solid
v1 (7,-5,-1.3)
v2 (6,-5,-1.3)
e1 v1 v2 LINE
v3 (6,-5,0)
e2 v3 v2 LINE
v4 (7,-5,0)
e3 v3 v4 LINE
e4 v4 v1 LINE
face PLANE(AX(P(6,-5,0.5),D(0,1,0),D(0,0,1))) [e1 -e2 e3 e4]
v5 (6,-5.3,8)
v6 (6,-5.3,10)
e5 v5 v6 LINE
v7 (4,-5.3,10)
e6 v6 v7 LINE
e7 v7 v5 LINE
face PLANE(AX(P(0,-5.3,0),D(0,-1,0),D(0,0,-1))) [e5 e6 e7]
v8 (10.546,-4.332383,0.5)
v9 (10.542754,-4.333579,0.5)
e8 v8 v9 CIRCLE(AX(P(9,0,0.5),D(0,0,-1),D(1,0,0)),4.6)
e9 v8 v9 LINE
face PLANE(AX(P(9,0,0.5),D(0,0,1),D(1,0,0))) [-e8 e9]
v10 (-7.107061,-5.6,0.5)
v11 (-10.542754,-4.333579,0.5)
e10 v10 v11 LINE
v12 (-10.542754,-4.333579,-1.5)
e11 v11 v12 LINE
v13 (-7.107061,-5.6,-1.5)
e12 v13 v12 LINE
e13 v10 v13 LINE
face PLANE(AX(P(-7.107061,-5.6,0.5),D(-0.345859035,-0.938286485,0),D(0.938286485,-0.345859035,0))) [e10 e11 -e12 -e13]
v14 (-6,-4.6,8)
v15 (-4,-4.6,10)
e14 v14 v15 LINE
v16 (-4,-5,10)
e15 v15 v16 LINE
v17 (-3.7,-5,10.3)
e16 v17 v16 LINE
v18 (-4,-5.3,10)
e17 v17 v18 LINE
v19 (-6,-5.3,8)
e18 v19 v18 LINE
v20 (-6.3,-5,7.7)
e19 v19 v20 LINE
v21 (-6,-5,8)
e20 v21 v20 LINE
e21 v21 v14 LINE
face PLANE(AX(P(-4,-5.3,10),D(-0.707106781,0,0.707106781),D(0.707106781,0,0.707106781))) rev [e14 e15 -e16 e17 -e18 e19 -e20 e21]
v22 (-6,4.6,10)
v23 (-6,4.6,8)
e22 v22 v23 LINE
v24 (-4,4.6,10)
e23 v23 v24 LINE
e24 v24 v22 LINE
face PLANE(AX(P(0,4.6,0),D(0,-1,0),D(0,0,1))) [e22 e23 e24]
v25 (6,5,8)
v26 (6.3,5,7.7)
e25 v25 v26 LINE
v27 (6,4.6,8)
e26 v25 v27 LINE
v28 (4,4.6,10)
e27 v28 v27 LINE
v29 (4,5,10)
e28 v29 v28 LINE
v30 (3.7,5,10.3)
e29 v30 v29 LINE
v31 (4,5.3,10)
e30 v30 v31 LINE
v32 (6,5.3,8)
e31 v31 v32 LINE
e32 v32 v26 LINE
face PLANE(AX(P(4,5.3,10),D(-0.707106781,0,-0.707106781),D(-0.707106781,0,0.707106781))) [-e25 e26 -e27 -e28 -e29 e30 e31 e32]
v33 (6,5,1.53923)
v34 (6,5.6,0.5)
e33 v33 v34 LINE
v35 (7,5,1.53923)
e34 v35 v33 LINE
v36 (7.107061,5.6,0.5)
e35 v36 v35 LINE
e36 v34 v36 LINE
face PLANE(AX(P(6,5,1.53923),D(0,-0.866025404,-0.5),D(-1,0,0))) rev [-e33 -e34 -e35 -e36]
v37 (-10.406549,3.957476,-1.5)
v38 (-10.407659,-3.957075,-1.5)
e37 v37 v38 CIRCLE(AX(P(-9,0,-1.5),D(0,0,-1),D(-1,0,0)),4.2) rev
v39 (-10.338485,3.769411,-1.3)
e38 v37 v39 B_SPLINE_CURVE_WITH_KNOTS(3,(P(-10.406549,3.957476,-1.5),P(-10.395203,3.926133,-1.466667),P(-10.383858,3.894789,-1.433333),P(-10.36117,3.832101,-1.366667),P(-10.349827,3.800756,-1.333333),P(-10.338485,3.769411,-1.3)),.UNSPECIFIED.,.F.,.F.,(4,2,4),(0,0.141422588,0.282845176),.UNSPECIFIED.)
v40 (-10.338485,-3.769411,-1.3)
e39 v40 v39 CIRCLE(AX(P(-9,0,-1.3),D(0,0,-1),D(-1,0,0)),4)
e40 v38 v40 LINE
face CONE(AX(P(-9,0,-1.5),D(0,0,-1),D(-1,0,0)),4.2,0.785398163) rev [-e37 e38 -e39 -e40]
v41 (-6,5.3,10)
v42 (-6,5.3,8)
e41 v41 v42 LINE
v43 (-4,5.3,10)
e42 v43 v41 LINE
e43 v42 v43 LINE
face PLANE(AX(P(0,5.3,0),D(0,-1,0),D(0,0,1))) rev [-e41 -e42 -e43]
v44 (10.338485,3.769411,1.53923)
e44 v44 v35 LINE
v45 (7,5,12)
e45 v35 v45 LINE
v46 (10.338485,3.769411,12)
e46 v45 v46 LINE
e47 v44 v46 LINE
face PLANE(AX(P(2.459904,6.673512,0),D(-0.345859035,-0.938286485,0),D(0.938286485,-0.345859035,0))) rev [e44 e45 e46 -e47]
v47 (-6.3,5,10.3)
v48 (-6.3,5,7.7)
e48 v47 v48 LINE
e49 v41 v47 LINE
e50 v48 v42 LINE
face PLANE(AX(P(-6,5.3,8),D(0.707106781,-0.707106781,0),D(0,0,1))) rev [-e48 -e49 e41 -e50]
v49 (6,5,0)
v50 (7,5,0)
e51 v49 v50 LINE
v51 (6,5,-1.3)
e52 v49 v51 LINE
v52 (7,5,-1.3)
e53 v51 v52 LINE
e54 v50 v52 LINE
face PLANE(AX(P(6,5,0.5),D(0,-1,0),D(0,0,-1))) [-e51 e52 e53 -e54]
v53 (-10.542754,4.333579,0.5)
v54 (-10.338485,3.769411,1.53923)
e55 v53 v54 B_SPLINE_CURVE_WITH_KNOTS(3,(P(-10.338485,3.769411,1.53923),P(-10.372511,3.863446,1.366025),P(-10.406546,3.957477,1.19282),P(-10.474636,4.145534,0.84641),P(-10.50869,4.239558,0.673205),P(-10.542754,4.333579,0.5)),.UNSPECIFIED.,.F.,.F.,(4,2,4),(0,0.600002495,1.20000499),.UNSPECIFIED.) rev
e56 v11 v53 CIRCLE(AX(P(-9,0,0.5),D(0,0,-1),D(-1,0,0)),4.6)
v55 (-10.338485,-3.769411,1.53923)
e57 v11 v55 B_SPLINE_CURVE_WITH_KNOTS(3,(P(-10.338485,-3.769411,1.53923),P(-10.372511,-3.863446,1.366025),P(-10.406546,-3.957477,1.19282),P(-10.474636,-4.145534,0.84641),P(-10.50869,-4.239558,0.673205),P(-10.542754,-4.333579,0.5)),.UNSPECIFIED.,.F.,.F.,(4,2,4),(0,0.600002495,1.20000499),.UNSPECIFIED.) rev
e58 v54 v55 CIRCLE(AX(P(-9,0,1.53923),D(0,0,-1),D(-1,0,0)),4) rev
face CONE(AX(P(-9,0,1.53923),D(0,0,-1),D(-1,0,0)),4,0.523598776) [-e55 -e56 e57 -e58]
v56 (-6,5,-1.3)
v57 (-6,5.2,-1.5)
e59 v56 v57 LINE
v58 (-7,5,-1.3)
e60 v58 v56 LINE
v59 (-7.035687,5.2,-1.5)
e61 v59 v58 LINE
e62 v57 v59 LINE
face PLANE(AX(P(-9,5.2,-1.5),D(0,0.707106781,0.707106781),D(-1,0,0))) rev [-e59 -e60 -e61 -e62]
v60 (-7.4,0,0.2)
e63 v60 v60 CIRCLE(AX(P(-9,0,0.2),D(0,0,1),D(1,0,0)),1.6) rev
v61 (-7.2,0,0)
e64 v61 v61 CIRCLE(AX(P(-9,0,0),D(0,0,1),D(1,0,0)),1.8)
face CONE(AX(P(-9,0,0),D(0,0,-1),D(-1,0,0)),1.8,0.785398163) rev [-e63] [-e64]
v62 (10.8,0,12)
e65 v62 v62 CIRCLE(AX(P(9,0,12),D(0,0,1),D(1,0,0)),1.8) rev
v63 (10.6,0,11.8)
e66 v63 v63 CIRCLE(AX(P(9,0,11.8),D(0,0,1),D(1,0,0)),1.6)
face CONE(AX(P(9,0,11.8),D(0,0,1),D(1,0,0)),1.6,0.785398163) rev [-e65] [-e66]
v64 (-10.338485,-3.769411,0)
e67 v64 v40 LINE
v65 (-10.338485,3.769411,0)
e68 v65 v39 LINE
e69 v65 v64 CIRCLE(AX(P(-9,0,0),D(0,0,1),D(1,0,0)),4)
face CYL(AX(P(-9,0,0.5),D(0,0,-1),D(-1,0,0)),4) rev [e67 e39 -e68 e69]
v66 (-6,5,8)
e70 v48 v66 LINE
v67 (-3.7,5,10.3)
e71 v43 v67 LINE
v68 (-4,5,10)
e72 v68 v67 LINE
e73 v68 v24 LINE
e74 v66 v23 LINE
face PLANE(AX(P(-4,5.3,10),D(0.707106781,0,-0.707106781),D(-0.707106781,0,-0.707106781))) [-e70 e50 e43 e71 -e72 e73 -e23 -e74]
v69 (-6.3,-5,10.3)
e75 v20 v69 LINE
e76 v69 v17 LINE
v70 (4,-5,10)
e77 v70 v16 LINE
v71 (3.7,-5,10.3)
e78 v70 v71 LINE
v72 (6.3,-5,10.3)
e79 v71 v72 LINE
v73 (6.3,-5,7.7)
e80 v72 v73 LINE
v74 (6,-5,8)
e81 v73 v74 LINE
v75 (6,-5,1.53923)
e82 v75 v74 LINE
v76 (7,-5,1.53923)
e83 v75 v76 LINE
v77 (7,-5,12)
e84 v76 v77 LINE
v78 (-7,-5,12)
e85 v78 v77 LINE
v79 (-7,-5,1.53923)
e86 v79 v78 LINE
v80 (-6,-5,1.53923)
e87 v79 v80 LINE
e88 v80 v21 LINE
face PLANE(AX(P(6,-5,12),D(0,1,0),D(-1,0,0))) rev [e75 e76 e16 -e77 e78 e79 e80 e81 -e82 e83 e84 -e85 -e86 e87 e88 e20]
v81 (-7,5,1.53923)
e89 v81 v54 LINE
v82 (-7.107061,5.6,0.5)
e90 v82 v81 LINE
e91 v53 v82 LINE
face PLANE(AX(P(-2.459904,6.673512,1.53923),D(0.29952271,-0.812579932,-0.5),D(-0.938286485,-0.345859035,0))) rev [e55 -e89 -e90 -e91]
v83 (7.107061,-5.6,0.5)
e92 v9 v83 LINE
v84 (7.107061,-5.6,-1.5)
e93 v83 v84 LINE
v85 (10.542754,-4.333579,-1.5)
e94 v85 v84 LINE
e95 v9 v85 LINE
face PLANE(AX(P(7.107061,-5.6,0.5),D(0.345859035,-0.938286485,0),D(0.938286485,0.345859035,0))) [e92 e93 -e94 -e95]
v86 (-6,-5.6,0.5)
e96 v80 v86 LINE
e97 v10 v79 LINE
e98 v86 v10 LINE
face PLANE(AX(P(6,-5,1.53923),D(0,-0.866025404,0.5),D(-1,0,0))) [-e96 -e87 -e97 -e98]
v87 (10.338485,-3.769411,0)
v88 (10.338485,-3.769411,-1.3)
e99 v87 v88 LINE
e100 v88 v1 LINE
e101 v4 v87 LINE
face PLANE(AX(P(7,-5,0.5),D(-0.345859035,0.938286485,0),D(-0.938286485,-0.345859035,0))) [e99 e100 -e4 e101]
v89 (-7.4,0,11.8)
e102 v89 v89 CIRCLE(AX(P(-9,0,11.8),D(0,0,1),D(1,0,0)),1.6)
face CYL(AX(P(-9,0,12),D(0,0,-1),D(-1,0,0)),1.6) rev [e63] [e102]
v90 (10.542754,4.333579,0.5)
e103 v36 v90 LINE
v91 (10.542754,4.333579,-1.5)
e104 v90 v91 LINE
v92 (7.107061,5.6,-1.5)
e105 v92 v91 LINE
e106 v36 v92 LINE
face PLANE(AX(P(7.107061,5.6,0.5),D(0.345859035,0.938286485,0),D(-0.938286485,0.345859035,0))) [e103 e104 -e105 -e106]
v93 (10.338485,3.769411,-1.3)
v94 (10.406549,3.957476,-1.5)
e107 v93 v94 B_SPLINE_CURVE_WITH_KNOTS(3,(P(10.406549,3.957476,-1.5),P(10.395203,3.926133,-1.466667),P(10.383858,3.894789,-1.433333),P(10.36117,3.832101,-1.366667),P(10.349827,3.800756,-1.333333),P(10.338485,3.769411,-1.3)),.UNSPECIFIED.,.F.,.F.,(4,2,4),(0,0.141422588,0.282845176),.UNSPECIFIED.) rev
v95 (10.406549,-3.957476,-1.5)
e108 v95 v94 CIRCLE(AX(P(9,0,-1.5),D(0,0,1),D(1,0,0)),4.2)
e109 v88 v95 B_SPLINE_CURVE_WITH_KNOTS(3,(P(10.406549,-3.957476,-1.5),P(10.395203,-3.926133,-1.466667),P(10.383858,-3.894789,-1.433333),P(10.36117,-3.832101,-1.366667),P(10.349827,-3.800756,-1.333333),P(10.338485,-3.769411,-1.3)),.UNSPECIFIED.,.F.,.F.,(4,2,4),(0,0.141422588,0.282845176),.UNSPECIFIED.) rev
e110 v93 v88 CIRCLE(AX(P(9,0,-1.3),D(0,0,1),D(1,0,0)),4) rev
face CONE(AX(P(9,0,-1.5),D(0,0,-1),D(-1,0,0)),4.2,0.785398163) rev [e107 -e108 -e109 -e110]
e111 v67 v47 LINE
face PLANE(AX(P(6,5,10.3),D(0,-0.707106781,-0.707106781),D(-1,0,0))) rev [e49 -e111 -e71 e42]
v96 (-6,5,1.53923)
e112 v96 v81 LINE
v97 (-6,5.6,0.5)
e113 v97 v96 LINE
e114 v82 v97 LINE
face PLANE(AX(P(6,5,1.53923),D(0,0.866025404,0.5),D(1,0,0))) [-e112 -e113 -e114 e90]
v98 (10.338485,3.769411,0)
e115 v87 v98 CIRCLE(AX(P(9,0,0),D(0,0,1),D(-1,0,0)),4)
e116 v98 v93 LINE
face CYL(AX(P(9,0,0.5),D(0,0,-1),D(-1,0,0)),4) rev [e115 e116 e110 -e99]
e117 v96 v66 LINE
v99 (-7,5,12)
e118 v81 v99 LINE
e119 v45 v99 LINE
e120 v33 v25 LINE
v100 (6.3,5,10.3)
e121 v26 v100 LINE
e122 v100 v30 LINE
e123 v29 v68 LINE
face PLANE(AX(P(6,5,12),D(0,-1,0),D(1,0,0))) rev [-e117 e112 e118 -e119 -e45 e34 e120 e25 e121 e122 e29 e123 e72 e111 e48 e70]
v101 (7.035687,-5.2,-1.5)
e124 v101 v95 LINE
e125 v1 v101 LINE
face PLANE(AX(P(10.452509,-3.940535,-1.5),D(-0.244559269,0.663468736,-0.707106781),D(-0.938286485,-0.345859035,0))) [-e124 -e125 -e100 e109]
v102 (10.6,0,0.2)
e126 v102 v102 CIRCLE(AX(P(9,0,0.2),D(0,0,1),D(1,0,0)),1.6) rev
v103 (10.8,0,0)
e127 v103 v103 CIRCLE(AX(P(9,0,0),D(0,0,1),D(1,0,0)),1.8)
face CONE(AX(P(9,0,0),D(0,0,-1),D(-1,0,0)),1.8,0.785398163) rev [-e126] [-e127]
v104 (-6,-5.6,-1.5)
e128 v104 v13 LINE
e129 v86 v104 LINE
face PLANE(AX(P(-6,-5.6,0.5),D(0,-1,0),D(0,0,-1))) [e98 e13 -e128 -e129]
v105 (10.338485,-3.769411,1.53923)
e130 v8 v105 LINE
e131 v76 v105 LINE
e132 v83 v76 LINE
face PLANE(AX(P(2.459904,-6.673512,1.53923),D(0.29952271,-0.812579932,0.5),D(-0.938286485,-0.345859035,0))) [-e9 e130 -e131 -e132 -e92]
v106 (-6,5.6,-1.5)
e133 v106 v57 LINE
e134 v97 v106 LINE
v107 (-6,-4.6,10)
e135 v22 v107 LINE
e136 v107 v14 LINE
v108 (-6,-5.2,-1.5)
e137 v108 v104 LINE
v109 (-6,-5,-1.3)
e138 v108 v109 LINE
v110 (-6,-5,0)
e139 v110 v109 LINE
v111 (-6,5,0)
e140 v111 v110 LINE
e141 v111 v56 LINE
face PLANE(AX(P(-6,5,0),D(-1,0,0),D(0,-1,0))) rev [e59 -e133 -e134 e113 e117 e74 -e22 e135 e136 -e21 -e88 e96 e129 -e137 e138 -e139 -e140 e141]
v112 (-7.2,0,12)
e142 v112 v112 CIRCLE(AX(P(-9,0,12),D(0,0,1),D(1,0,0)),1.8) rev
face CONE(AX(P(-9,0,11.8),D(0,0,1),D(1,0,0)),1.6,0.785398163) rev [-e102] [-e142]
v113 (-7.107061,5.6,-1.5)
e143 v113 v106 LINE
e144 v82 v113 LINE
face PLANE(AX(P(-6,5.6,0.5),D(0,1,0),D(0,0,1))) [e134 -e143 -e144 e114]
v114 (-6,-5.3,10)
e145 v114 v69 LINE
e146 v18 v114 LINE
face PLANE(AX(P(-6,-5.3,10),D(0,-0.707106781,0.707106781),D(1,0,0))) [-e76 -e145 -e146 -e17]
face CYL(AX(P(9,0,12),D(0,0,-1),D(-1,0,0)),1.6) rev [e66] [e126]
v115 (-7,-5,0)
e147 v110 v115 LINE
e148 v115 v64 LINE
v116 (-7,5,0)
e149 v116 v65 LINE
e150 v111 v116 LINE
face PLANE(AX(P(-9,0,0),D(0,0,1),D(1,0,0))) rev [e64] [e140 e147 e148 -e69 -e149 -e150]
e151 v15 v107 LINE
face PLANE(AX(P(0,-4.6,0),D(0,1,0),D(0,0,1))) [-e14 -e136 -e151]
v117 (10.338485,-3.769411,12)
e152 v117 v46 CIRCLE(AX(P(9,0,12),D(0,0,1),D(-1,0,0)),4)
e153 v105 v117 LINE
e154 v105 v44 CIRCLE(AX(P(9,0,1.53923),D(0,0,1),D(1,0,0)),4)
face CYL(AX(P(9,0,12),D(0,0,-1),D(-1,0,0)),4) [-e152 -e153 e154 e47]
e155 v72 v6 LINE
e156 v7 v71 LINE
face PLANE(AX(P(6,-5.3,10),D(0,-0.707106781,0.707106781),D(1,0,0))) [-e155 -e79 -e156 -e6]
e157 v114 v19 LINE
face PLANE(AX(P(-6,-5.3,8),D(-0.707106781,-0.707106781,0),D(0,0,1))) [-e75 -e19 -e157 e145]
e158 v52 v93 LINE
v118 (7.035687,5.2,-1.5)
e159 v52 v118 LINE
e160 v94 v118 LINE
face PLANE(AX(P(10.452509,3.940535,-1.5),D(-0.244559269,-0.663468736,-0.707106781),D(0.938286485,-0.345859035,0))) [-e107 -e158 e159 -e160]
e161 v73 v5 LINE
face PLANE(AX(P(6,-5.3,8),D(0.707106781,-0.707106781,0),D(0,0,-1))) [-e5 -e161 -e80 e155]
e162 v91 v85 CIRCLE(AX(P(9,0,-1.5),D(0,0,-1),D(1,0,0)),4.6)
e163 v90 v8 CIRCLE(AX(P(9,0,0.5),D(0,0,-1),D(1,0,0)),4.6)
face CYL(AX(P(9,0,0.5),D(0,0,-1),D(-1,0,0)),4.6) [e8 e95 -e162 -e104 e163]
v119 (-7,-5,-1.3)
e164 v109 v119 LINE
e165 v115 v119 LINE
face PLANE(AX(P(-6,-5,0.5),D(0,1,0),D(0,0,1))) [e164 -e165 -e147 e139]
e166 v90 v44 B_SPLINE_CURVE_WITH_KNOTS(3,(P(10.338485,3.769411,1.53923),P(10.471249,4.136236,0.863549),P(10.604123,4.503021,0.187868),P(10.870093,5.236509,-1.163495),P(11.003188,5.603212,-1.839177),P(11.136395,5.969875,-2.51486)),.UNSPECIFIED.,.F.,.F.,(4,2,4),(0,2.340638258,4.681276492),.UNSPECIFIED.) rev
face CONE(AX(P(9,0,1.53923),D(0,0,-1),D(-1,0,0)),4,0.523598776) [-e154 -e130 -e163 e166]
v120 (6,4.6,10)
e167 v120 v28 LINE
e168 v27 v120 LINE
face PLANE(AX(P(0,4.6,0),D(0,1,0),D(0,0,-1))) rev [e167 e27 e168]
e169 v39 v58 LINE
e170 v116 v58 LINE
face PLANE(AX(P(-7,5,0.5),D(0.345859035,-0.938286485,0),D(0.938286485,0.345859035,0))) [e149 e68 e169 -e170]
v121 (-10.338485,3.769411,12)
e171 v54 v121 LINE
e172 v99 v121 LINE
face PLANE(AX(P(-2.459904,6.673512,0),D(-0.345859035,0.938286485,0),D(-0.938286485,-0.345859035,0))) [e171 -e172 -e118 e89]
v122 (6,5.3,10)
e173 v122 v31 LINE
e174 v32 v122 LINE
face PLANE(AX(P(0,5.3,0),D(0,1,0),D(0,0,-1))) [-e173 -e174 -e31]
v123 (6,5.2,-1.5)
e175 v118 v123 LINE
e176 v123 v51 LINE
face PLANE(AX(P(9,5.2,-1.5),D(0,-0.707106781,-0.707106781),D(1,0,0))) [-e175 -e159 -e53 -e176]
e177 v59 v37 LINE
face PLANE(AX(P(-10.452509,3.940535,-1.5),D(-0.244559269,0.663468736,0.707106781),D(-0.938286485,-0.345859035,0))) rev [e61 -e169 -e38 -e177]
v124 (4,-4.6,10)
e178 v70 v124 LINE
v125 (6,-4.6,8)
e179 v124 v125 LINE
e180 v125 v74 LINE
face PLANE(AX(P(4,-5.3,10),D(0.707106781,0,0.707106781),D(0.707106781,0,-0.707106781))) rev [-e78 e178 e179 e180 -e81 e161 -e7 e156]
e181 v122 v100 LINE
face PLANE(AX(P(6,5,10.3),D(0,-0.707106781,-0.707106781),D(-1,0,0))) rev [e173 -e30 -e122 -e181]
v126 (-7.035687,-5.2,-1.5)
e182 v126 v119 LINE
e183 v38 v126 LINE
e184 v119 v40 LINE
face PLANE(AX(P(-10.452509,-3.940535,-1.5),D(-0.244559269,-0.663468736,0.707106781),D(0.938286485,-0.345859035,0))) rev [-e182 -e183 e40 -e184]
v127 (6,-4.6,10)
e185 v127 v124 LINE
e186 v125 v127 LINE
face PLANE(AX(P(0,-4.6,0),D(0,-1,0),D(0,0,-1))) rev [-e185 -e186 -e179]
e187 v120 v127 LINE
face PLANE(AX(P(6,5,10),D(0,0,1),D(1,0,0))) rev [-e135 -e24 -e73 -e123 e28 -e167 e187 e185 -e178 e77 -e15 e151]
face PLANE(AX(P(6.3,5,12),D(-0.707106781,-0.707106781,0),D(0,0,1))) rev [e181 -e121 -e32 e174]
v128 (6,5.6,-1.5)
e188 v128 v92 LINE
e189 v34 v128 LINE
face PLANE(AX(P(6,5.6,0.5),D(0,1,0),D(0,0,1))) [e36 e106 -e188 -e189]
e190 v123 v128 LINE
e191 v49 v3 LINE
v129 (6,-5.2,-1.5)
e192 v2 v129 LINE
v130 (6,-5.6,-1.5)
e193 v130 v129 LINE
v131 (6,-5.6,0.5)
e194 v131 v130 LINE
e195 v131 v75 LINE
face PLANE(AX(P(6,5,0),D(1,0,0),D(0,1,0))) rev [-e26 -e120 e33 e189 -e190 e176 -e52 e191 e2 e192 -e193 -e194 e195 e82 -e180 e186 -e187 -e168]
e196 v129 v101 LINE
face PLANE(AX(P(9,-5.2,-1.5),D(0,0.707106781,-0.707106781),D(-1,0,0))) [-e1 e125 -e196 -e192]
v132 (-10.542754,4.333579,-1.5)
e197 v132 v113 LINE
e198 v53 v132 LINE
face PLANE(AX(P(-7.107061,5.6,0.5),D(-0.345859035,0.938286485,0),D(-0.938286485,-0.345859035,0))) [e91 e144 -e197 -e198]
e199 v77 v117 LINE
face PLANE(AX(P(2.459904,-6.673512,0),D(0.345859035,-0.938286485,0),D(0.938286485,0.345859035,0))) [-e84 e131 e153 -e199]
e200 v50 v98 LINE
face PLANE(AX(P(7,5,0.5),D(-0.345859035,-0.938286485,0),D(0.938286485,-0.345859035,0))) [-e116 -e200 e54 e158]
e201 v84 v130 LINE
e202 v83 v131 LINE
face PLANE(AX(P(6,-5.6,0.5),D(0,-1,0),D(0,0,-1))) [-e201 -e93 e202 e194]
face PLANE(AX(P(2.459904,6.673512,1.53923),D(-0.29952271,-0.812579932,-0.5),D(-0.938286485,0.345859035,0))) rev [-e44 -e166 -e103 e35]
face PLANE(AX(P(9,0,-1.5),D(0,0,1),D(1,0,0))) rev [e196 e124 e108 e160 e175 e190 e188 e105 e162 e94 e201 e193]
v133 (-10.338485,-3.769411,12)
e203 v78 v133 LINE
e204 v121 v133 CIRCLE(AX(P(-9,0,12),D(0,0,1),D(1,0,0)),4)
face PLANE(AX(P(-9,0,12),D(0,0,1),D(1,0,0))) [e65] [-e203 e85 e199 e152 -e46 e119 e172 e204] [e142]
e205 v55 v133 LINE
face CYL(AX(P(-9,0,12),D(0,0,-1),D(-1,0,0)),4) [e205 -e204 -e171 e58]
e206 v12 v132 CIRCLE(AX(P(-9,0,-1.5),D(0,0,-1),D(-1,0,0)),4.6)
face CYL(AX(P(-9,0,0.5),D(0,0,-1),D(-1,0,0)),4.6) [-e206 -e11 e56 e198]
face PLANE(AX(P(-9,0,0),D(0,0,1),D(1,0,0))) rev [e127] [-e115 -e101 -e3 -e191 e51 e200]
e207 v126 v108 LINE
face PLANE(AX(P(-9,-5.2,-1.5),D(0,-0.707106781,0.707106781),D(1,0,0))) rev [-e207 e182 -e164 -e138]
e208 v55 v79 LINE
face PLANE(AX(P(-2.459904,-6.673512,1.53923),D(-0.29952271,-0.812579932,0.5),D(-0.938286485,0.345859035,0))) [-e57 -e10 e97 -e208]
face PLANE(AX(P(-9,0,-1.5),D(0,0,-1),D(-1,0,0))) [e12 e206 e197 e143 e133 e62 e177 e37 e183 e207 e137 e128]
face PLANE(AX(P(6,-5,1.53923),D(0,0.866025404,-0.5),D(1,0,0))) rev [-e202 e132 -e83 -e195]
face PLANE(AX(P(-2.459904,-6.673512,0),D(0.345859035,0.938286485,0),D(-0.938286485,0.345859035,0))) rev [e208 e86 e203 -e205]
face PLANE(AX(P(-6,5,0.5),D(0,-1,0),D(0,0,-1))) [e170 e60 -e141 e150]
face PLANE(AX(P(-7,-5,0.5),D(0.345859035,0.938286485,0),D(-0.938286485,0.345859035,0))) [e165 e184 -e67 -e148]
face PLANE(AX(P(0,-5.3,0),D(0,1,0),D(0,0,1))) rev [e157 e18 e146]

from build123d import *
from OCP.BRepFilletAPI import BRepFilletAPI_MakeChamfer

# Parameters (mm, degrees)
SKIZZE2_R                            = 1.6
AUFSATZ_LINEAR_AUSTRAGEN1_DEPTH      = 12
SCHNITT_LINEAR_AUSTRAGEN1_DEPTH      = 19.384776311
SCHNITT_LINEAR_AUSTRAGEN1_DEPTH_BACK = 19.384776311
SKIZZE3_W                            = 12
SKIZZE3_H                            = 10
AUFSATZ_LINEAR_AUSTRAGEN2_DEPTH      = 12
AUFSATZ_LINEAR_START                 = -0.4
AUFSATZ_LINEAR_AUSTRAGEN3_DEPTH      = 0.7
FASE3_SIZE                           = 0.3
AUFSATZ_LINEAR_AUSTRAGEN4_DEPTH      = 2
FASE1_SIZE                           = 0.6
FASE1_SIZE_2                         = 1.039230485
FASE2_SIZE                           = 0.2


with BuildPart() as part:
    # Skizze2 → Aufsatz-Linear austragen1 (new body)
    with BuildSketch(Plane.XY):
        with BuildLine():
            Line((-6, -2.645751311), (-6, -5))
            Line((-6, -5), (6, -5))
            Line((6, -5), (6, -2.645751311))
            ThreePointArc((6, -2.645751311), (13, 0), (6, 2.645751311))
            Line((6, 2.645751311), (6, 5))
            Line((6, 5), (-6, 5))
            Line((-6, 5), (-6, 2.645751311))
            ThreePointArc((-6, 2.645751311), (-13, 0), (-6, -2.645751311))
        make_face()
        with Locations((-9, 0)):
            Circle(SKIZZE2_R, mode=Mode.SUBTRACT)
        with Locations(Location((9, 0, 0), (0, 0, 180))):
            Circle(SKIZZE2_R, mode=Mode.SUBTRACT)
    extrude(amount=AUFSATZ_LINEAR_AUSTRAGEN1_DEPTH)

    # Skizze3 → Schnitt-Linear austragen1 (cut, two sides: drawn at the far end of the back side and taken through both)
    with BuildSketch(Plane(origin=(0, 0, 0), x_dir=(-1, 0, 0), z_dir=(0, -1, 0)).offset(-SCHNITT_LINEAR_AUSTRAGEN1_DEPTH_BACK)):
        with Locations((0, -5)):
            Rectangle(SKIZZE3_W, SKIZZE3_H)
    extrude(amount=SCHNITT_LINEAR_AUSTRAGEN1_DEPTH + SCHNITT_LINEAR_AUSTRAGEN1_DEPTH_BACK, mode=Mode.SUBTRACT)

    # Skizze4 → Aufsatz-Linear austragen2 (add, through all)
    with BuildSketch(Plane.XY.offset(12)):
        with BuildLine():
            Line((-6, 2.645751311), (-6, 5))
            Line((-6, 5), (-7, 5))
            Line((-7, 5), (-10.338485005, 3.769410815))
            ThreePointArc((-10.338485005, 3.769410815), (-7.997098863, 3.872233117), (-6, 2.645751311))
        make_face()
        with BuildLine():
            ThreePointArc((-6, -2.645751311), (-7.997098863, -3.872233117), (-10.338485005, -3.769410815))
            Line((-10.338485005, -3.769410815), (-7, -5))
            Line((-7, -5), (-6, -5))
            Line((-6, -5), (-6, -2.645751311))
        make_face()
        with BuildLine():
            ThreePointArc((6, 2.645751311), (7.997098863, 3.872233117), (10.338485005, 3.769410815))
            Line((10.338485005, 3.769410815), (7, 5))
            Line((7, 5), (6, 5))
            Line((6, 5), (6, 2.645751311))
        make_face()
        with BuildLine():
            Line((6, -2.645751311), (6, -5))
            Line((6, -5), (7, -5))
            Line((7, -5), (10.338485005, -3.769410815))
            ThreePointArc((10.338485005, -3.769410815), (7.997098863, -3.872233117), (6, -2.645751311))
        make_face()
    extrude(amount=-AUFSATZ_LINEAR_AUSTRAGEN2_DEPTH)

    # Skizze5 → Aufsatz-Linear austragen3 (add)
    with BuildSketch(Plane.XZ.offset(5).offset(AUFSATZ_LINEAR_START)):
        Polygon((-6, 10), (-4, 10), (-6, 8), align=None)
        Polygon((6, 8), (6, 10), (4, 10), align=None)
    aufsatz_linear_austragen3 = extrude(amount=AUFSATZ_LINEAR_AUSTRAGEN3_DEPTH)

    # Spiegeln1: Aufsatz-Linear austragen3 across plane
    add(aufsatz_linear_austragen3.mirror(Plane(origin=(0, 0, 0), x_dir=(0, 0, 1), z_dir=(0, -1, 0))))

    # Fase3
    fase3_edges = [part.edges().sort_by_distance(p)[0] for p in [
        (6, -5, 9),
        (5, -5, 10),
        (-6, -5, 9),
        (-5, -5, 10),
        (6, 5, 9),
        (5, 5, 10),
        (-5, 5, 10),
        (-6, 5, 9),
    ]]
    chamfer(fase3_edges, length=FASE3_SIZE - 0.0001)  # a hair under: the kernel refuses the full size

    # Skizze6 → Aufsatz-Linear austragen4 (add)
    with BuildSketch(Plane(origin=(0, 0, -1.5), x_dir=(-1, 0, 0), z_dir=(0, 0, -1))):
        with BuildLine():
            Line((6, -5), (7, -5))
            Line((7, -5), (10.338485005, -3.769410815))
            ThreePointArc((10.338485005, -3.769410815), (13, 0), (10.338485005, 3.769410815))
            Line((10.338485005, 3.769410815), (7, 5))
            Line((7, 5), (6, 5))
            Line((6, 5), (6, 5.6))
            Line((6, 5.6), (7.107061274, 5.6))
            Line((7.107061274, 5.6), (10.542753877, 4.333579407))
            ThreePointArc((10.542753877, 4.333579407), (13.6, 0), (10.542753877, -4.333579407))
            Line((10.542753877, -4.333579407), (7.107061274, -5.6))
            Line((7.107061274, -5.6), (6, -5.6))
            Line((6, -5.6), (6, -5))
        make_face()
        with BuildLine():
            Line((-6, -5), (-6, -5.6))
            Line((-6, -5.6), (-7.107061274, -5.6))
            Line((-7.107061274, -5.6), (-10.542753877, -4.333579407))
            ThreePointArc((-10.542753877, -4.333579407), (-13.6, 0), (-10.542753877, 4.333579407))
            Line((-10.542753877, 4.333579407), (-7.107061274, 5.6))
            Line((-7.107061274, 5.6), (-6, 5.6))
            Line((-6, 5.6), (-6, 5))
            Line((-6, 5), (-7, 5))
            Line((-7, 5), (-10.338485005, 3.769410815))
            ThreePointArc((-10.338485005, 3.769410815), (-13, 0), (-10.338485005, -3.769410815))
            Line((-10.338485005, -3.769410815), (-7, -5))
            Line((-7, -5), (-6, -5))
        make_face()
    extrude(amount=-AUFSATZ_LINEAR_AUSTRAGEN4_DEPTH)

    # Fase1
    fase1_edges_1 = [part.edges().sort_by_distance(p)[0] for p in [
        (-6.5, -5, 0.5),
    ]]
    fase1_side_1 = [part.faces().sort_by_distance(p)[0] for p in [
        (-6.5, -5.012, 0.5),
    ]]
    fase1_edges_2 = [part.edges().sort_by_distance(p)[0] for p in [
        (-8.669242502, -4.384705408, 0.5),
    ]]
    fase1_side_2 = [part.faces().sort_by_distance(p)[0] for p in [
        (-8.673392811, -4.395964845, 0.5),
    ]]
    fase1_edges_3 = [part.edges().sort_by_distance(p)[0] for p in [
        (-8.669242502, 4.384705408, 0.5),
    ]]
    fase1_side_3 = [part.faces().sort_by_distance(p)[0] for p in [
        (-8.673392811, 4.395964845, 0.5),
    ]]
    fase1_edges_4 = [part.edges().sort_by_distance(p)[0] for p in [
        (-6.5, 5, 0.5),
    ]]
    fase1_side_4 = [part.faces().sort_by_distance(p)[0] for p in [
        (-6.5, 5, 0.512),
    ]]
    fase1_edges_5 = [part.edges().sort_by_distance(p)[0] for p in [
        (6.5, 5, 0.5),
    ]]
    fase1_side_5 = [part.faces().sort_by_distance(p)[0] for p in [
        (6.5, 5, 0.512),
    ]]
    fase1_edges_6 = [part.edges().sort_by_distance(p)[0] for p in [
        (8.669242502, 4.384705408, 0.5),
    ]]
    fase1_side_6 = [part.faces().sort_by_distance(p)[0] for p in [
        (8.669242502, 4.384705408, 0.512),
    ]]
    fase1_edges_7 = [part.edges().sort_by_distance(p)[0] for p in [
        (8.669242502, -4.384705408, 0.5),
    ]]
    fase1_side_7 = [part.faces().sort_by_distance(p)[0] for p in [
        (8.673392811, -4.395964845, 0.5),
    ]]
    fase1_edges_8 = [part.edges().sort_by_distance(p)[0] for p in [
        (6.5, -5, 0.5),
    ]]
    fase1_side_8 = [part.faces().sort_by_distance(p)[0] for p in [
        (6.5, -5.012, 0.5),
    ]]
    fase1 = BRepFilletAPI_MakeChamfer(part.part.solid().wrapped)
    for e in fase1_edges_1:
        fase1.Add(FASE1_SIZE - 0.0001, FASE1_SIZE_2 - 0.0001, e.wrapped, fase1_side_1[0].wrapped)
    for e in fase1_edges_2:
        fase1.Add(FASE1_SIZE - 0.0001, FASE1_SIZE_2 - 0.0001, e.wrapped, fase1_side_2[0].wrapped)
    for e in fase1_edges_3:
        fase1.Add(FASE1_SIZE - 0.0001, FASE1_SIZE_2 - 0.0001, e.wrapped, fase1_side_3[0].wrapped)
    for e in fase1_edges_4:
        fase1.Add(FASE1_SIZE_2 - 0.0001, FASE1_SIZE - 0.0001, e.wrapped, fase1_side_4[0].wrapped)
    for e in fase1_edges_5:
        fase1.Add(FASE1_SIZE_2 - 0.0001, FASE1_SIZE - 0.0001, e.wrapped, fase1_side_5[0].wrapped)
    for e in fase1_edges_6:
        fase1.Add(FASE1_SIZE_2 - 0.0001, FASE1_SIZE - 0.0001, e.wrapped, fase1_side_6[0].wrapped)
    for e in fase1_edges_7:
        fase1.Add(FASE1_SIZE - 0.0001, FASE1_SIZE_2 - 0.0001, e.wrapped, fase1_side_7[0].wrapped)
    for e in fase1_edges_8:
        fase1.Add(FASE1_SIZE - 0.0001, FASE1_SIZE_2 - 0.0001, e.wrapped, fase1_side_8[0].wrapped)
    add(Compound.cast(fase1.Shape()), mode=Mode.REPLACE)  # a hair under: the kernel refuses the full size

    # Fase2
    fase2_edges = [part.edges().sort_by_distance(p)[0] for p in [
        (-6.5, -5, -1.5),
        (-8.669242502, -4.384705408, -1.5),
        (-8.669242502, 4.384705408, -1.5),
        (-6.5, 5, -1.5),
        (6.5, -5, -1.5),
        (8.669242502, -4.384705408, -1.5),
        (13, 0, -1.5),
        (8.669242502, 4.384705408, -1.5),
        (6.5, 5, -1.5),
        (-10.6, 0, 12),
        (-10.6, 0, 0),
        (10.6, 0, 12),
        (10.6, 0, 0),
    ]]
    chamfer(fase2_edges, length=FASE2_SIZE)


solid = part.part
